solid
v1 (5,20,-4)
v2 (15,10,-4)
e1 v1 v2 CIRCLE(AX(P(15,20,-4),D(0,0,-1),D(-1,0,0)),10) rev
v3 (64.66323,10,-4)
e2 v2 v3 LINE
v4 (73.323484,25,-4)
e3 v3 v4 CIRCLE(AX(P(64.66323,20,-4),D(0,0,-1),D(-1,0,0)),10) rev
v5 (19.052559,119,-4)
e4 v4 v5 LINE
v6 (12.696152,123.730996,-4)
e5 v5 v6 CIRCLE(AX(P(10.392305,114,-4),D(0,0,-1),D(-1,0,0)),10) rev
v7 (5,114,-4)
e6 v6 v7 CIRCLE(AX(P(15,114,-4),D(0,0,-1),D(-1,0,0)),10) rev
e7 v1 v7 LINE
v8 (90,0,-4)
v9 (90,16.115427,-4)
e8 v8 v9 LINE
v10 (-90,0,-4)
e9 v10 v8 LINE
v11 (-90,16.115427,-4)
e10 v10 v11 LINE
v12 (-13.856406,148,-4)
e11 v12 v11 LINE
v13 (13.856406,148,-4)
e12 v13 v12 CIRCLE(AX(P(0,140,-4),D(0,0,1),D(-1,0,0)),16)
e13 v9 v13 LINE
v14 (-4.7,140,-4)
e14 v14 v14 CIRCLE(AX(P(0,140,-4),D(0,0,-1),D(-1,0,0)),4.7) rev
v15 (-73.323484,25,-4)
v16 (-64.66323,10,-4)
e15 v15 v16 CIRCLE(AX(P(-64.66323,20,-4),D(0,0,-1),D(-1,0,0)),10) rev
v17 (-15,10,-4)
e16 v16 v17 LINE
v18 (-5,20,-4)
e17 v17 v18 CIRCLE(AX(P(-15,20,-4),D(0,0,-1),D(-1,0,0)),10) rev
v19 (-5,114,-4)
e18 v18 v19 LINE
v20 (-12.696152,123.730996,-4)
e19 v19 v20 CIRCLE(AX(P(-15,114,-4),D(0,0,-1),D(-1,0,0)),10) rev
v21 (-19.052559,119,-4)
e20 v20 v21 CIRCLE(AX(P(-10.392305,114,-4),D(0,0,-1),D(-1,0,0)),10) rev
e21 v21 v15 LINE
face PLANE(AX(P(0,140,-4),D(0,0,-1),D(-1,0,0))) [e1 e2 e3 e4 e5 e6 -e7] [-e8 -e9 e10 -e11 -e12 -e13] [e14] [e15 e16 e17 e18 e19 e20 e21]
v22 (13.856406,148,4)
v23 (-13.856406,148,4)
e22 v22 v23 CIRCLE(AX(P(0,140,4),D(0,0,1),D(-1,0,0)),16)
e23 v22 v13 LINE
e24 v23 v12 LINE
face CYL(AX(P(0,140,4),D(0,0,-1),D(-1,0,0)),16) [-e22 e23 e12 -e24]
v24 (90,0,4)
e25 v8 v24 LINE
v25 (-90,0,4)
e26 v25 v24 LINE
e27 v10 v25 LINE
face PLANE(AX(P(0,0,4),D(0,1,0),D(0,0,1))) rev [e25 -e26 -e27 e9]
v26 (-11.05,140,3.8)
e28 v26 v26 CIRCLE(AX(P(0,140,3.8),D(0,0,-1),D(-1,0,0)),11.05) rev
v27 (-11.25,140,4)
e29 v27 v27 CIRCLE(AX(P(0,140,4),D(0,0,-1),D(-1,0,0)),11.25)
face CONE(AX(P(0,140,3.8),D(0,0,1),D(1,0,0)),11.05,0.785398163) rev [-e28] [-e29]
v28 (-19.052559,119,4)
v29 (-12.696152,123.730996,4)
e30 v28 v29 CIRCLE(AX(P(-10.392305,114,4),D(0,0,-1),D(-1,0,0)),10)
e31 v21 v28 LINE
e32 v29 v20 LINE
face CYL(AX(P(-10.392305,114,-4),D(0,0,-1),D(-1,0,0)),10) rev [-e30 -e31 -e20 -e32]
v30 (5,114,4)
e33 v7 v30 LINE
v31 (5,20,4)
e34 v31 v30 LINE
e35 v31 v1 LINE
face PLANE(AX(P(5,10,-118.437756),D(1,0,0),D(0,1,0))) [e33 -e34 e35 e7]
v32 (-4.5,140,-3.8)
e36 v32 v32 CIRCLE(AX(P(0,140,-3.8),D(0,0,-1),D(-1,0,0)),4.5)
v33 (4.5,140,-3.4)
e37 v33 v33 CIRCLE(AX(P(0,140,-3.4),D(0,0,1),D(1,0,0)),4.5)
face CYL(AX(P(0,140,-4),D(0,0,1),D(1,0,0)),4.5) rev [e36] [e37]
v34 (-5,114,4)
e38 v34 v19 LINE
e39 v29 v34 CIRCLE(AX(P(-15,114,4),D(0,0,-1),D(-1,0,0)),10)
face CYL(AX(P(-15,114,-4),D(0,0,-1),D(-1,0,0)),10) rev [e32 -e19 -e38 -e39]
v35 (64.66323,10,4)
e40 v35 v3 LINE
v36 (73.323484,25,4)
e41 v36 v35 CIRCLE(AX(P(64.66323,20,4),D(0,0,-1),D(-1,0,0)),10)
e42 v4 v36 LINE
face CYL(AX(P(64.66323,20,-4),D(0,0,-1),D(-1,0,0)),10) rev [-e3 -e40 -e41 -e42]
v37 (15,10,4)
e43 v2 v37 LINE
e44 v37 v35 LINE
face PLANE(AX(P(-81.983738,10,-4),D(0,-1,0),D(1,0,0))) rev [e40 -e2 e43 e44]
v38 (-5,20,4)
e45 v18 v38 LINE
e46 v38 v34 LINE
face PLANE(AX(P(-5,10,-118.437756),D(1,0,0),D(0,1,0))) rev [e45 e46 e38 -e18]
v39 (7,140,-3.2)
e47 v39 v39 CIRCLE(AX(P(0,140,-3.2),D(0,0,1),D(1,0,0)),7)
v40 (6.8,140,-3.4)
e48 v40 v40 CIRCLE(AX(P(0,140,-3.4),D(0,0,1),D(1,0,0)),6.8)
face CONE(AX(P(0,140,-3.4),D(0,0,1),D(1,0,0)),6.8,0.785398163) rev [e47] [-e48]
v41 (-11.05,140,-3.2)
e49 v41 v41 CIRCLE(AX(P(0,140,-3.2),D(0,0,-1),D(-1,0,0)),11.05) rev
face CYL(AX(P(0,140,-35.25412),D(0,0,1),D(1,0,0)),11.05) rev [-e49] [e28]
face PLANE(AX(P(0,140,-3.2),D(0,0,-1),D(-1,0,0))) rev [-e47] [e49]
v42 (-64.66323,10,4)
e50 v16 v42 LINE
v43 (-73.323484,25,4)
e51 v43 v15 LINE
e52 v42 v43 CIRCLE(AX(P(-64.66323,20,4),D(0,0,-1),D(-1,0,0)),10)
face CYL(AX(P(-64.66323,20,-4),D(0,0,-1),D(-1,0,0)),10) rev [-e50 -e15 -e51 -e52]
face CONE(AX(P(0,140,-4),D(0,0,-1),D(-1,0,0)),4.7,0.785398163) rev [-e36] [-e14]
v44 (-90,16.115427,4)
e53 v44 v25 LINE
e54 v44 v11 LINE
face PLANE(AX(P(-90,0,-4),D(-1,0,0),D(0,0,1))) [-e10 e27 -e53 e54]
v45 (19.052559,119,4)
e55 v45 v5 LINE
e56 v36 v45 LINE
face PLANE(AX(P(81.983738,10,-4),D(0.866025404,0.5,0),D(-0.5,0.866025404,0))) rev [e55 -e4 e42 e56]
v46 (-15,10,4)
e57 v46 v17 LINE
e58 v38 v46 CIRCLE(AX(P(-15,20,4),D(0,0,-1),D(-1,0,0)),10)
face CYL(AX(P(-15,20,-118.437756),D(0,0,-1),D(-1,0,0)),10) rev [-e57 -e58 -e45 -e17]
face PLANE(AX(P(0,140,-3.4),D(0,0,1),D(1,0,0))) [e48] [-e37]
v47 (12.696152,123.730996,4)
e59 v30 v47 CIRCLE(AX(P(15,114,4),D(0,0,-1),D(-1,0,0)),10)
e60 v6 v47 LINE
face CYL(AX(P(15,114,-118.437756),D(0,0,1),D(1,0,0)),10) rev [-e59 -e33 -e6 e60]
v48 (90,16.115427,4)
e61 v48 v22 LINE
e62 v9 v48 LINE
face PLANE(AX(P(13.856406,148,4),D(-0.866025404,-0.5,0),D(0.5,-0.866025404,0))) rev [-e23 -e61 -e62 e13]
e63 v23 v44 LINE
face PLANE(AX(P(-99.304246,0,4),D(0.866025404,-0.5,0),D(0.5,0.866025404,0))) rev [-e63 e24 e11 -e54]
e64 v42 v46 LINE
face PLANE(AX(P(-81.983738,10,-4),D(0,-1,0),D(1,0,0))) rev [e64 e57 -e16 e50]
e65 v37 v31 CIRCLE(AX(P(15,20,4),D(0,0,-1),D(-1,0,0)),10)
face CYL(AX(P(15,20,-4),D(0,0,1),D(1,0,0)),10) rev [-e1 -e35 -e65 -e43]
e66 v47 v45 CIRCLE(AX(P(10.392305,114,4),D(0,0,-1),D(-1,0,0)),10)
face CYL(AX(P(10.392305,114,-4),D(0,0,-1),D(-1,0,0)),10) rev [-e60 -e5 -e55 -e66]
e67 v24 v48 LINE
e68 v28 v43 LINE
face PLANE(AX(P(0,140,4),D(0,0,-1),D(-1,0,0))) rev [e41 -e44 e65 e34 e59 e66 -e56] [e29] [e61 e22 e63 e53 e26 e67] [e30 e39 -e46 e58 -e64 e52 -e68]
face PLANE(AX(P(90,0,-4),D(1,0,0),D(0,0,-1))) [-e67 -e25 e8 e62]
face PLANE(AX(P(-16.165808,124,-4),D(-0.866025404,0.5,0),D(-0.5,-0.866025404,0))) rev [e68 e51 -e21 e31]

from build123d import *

# Parameters (mm, degrees)
BOSS_EXTRUDE1_DEPTH = 4
SKETCH2_R           = 11.05
CUT_EXTRUDE1_DEPTH  = 7.2
SKETCH3_R           = 7
CUT_EXTRUDE2_DEPTH  = 0.2
SKETCH4_R           = 4.5
CUT_EXTRUDE3_DEPTH  = 186.073210739
CHAMFER1_SIZE       = 0.2
CUT_EXTRUDE4_DEPTH  = 186.09817215
SKETCH8_W           = 10
SKETCH8_H           = 114
EXTRUDE_THIN1_DEPTH = 8
FILLET1_R           = 10
SKETCH6_OUTSIDE_W   = 251.144
SKETCH6_OUTSIDE_H   = 208.536
SKETCH6_OUTSIDE_W_2 = 180
SKETCH6_OUTSIDE_H_2 = 156
CUT_EXTRUDE5_DEPTH  = 186.09817215


# Some blends are built 0.0001 mm under size
with BuildPart() as part:
    # Sketch1 → Boss-Extrude1 (new, symmetric)
    with BuildSketch(Plane.XY):
        with BuildLine():
            Line((0, 0), (-99.304246301, 0))
            Line((-99.304246301, 0), (-13.856406461, 148))
            ThreePointArc((-13.856406461, 148), (0, 156), (13.856406461, 148))
            Line((13.856406461, 148), (99.304246301, 0))
            Line((99.304246301, 0), (0, 0))
        make_face()
    extrude(amount=BOSS_EXTRUDE1_DEPTH, both=True)

    # Sketch2 → Cut-Extrude1 (cut)
    with BuildSketch(Plane.XY.offset(4)):
        with Locations((0, 140)):
            Circle(SKETCH2_R)
    extrude(amount=-CUT_EXTRUDE1_DEPTH, mode=Mode.SUBTRACT)

    # Sketch3 → Cut-Extrude2 (cut)
    with BuildSketch(Plane.XY.offset(-3.2)):
        with Locations((0, 140)):
            Circle(SKETCH3_R)
    extrude(amount=-CUT_EXTRUDE2_DEPTH, mode=Mode.SUBTRACT)

    # Sketch4 → Cut-Extrude3 (cut, through all)
    with BuildSketch(Plane.XY.offset(-3.4)):
        with Locations((0, 140)):
            Circle(SKETCH4_R)
    extrude(amount=-CUT_EXTRUDE3_DEPTH, mode=Mode.SUBTRACT)

    # Chamfer1
    chamfer1_edges = [part.edges().sort_by_distance(p)[0] for p in [
        (-11.05, 140, 4),
        (-7, 140, -3.4),
        (-4.5, 140, -4),
    ]]
    chamfer(chamfer1_edges, length=CHAMFER1_SIZE - 0.0001)  # a hair under: the kernel refuses the full size

    # Sketch5 → Cut-Extrude4 (cut, through all)
    with BuildSketch(Plane.XY.offset(4)):
        Polygon((-16.165807537, 124), (16.165807537, 124), (81.983738225, 10), (-81.983738225, 10), align=None)
    extrude(amount=-CUT_EXTRUDE4_DEPTH, mode=Mode.SUBTRACT)

    # Sketch8 → Extrude-Thin1 (add)
    with BuildSketch(Plane.XY.offset(4)):
        with Locations((0, 67)):
            Rectangle(SKETCH8_W, SKETCH8_H)
    extrude(amount=-EXTRUDE_THIN1_DEPTH)

    # Fillet1
    # the kernel refuses this fillet: 10 mm, written as the material it adds along each edge
    with BuildSketch(Plane(origin=(81.983738225, 10, 4), x_dir=(-0.5000000000000037, 0.8660254037844365, 0), z_dir=(0, 0, -1)), Plane(origin=(-81.983738225, 10, 4), x_dir=(1, 0, 0), z_dir=(0, 0, -1))) as fillet1_piece_1:
        with BuildLine():
            CenterArc((FILLET1_R * 1.73205080757, -FILLET1_R), FILLET1_R, 90, 120)
            Line((FILLET1_R * 0.866025403784, -FILLET1_R * 1.5), (0, 0))
            Line((0, 0), (FILLET1_R * 1.73205080757, 0))
        make_face()
    extrude(amount=8)
    with BuildSketch(Plane(origin=(16.165807537, 124, 4), x_dir=(-1, 0, 0), z_dir=(0, 0, -1))) as fillet1_piece_2:
        with BuildLine():
            CenterArc((FILLET1_R * 0.57735026919, -FILLET1_R), FILLET1_R, 90, 60)
            Line((-FILLET1_R * 0.288675134595, -FILLET1_R * 0.5), (0, 0))
            Line((0, 0), (FILLET1_R * 0.57735026919, 0))
        make_face()
    extrude(amount=8)
    with BuildSketch(Plane(origin=(-16.165807537, 124, 4), x_dir=(1, 0, 0), z_dir=(0, 0, -1))) as fillet1_piece_3:
        with BuildLine():
            CenterArc((FILLET1_R * 0.57735026919, FILLET1_R), FILLET1_R, 210, 60)
            Line((-FILLET1_R * 0.288675134595, FILLET1_R * 0.5), (0, 0))
            Line((0, 0), (FILLET1_R * 0.57735026919, 0))
        make_face()
    extrude(amount=8)
    with BuildSketch(Plane(origin=(-5, 10, 4), x_dir=(-1, 0, 0), z_dir=(0, 0, -1)), Plane(origin=(5, 124, 4), x_dir=(1, 0, 0), z_dir=(0, 0, -1))) as fillet1_piece_4:
        with BuildLine():
            CenterArc((FILLET1_R, FILLET1_R), FILLET1_R, 180, 90)
            Line((0, FILLET1_R), (0, 0))
            Line((0, 0), (FILLET1_R, 0))
        make_face()
    extrude(amount=8)
    with BuildSketch(Plane(origin=(5, 10, 4), x_dir=(1, 0, 0), z_dir=(0, 0, -1)), Plane(origin=(-5, 124, 4), x_dir=(-1, 0, 0), z_dir=(0, 0, -1))) as fillet1_piece_5:
        with BuildLine():
            CenterArc((FILLET1_R, -FILLET1_R), FILLET1_R, 90, 90)
            Line((0, -FILLET1_R), (0, 0))
            Line((0, 0), (FILLET1_R, 0))
        make_face()
    extrude(amount=8)

    # Sketch6 outside → Cut-Extrude5 (cut, through all)
    with BuildSketch(Plane.XY.offset(4)):
        with Locations((0, 78)):
            Rectangle(SKETCH6_OUTSIDE_W, SKETCH6_OUTSIDE_H)
        with Locations((0, 78)):
            Rectangle(SKETCH6_OUTSIDE_W_2, SKETCH6_OUTSIDE_H_2, mode=Mode.SUBTRACT)
    extrude(amount=-CUT_EXTRUDE5_DEPTH, mode=Mode.SUBTRACT)


solid = part.part
